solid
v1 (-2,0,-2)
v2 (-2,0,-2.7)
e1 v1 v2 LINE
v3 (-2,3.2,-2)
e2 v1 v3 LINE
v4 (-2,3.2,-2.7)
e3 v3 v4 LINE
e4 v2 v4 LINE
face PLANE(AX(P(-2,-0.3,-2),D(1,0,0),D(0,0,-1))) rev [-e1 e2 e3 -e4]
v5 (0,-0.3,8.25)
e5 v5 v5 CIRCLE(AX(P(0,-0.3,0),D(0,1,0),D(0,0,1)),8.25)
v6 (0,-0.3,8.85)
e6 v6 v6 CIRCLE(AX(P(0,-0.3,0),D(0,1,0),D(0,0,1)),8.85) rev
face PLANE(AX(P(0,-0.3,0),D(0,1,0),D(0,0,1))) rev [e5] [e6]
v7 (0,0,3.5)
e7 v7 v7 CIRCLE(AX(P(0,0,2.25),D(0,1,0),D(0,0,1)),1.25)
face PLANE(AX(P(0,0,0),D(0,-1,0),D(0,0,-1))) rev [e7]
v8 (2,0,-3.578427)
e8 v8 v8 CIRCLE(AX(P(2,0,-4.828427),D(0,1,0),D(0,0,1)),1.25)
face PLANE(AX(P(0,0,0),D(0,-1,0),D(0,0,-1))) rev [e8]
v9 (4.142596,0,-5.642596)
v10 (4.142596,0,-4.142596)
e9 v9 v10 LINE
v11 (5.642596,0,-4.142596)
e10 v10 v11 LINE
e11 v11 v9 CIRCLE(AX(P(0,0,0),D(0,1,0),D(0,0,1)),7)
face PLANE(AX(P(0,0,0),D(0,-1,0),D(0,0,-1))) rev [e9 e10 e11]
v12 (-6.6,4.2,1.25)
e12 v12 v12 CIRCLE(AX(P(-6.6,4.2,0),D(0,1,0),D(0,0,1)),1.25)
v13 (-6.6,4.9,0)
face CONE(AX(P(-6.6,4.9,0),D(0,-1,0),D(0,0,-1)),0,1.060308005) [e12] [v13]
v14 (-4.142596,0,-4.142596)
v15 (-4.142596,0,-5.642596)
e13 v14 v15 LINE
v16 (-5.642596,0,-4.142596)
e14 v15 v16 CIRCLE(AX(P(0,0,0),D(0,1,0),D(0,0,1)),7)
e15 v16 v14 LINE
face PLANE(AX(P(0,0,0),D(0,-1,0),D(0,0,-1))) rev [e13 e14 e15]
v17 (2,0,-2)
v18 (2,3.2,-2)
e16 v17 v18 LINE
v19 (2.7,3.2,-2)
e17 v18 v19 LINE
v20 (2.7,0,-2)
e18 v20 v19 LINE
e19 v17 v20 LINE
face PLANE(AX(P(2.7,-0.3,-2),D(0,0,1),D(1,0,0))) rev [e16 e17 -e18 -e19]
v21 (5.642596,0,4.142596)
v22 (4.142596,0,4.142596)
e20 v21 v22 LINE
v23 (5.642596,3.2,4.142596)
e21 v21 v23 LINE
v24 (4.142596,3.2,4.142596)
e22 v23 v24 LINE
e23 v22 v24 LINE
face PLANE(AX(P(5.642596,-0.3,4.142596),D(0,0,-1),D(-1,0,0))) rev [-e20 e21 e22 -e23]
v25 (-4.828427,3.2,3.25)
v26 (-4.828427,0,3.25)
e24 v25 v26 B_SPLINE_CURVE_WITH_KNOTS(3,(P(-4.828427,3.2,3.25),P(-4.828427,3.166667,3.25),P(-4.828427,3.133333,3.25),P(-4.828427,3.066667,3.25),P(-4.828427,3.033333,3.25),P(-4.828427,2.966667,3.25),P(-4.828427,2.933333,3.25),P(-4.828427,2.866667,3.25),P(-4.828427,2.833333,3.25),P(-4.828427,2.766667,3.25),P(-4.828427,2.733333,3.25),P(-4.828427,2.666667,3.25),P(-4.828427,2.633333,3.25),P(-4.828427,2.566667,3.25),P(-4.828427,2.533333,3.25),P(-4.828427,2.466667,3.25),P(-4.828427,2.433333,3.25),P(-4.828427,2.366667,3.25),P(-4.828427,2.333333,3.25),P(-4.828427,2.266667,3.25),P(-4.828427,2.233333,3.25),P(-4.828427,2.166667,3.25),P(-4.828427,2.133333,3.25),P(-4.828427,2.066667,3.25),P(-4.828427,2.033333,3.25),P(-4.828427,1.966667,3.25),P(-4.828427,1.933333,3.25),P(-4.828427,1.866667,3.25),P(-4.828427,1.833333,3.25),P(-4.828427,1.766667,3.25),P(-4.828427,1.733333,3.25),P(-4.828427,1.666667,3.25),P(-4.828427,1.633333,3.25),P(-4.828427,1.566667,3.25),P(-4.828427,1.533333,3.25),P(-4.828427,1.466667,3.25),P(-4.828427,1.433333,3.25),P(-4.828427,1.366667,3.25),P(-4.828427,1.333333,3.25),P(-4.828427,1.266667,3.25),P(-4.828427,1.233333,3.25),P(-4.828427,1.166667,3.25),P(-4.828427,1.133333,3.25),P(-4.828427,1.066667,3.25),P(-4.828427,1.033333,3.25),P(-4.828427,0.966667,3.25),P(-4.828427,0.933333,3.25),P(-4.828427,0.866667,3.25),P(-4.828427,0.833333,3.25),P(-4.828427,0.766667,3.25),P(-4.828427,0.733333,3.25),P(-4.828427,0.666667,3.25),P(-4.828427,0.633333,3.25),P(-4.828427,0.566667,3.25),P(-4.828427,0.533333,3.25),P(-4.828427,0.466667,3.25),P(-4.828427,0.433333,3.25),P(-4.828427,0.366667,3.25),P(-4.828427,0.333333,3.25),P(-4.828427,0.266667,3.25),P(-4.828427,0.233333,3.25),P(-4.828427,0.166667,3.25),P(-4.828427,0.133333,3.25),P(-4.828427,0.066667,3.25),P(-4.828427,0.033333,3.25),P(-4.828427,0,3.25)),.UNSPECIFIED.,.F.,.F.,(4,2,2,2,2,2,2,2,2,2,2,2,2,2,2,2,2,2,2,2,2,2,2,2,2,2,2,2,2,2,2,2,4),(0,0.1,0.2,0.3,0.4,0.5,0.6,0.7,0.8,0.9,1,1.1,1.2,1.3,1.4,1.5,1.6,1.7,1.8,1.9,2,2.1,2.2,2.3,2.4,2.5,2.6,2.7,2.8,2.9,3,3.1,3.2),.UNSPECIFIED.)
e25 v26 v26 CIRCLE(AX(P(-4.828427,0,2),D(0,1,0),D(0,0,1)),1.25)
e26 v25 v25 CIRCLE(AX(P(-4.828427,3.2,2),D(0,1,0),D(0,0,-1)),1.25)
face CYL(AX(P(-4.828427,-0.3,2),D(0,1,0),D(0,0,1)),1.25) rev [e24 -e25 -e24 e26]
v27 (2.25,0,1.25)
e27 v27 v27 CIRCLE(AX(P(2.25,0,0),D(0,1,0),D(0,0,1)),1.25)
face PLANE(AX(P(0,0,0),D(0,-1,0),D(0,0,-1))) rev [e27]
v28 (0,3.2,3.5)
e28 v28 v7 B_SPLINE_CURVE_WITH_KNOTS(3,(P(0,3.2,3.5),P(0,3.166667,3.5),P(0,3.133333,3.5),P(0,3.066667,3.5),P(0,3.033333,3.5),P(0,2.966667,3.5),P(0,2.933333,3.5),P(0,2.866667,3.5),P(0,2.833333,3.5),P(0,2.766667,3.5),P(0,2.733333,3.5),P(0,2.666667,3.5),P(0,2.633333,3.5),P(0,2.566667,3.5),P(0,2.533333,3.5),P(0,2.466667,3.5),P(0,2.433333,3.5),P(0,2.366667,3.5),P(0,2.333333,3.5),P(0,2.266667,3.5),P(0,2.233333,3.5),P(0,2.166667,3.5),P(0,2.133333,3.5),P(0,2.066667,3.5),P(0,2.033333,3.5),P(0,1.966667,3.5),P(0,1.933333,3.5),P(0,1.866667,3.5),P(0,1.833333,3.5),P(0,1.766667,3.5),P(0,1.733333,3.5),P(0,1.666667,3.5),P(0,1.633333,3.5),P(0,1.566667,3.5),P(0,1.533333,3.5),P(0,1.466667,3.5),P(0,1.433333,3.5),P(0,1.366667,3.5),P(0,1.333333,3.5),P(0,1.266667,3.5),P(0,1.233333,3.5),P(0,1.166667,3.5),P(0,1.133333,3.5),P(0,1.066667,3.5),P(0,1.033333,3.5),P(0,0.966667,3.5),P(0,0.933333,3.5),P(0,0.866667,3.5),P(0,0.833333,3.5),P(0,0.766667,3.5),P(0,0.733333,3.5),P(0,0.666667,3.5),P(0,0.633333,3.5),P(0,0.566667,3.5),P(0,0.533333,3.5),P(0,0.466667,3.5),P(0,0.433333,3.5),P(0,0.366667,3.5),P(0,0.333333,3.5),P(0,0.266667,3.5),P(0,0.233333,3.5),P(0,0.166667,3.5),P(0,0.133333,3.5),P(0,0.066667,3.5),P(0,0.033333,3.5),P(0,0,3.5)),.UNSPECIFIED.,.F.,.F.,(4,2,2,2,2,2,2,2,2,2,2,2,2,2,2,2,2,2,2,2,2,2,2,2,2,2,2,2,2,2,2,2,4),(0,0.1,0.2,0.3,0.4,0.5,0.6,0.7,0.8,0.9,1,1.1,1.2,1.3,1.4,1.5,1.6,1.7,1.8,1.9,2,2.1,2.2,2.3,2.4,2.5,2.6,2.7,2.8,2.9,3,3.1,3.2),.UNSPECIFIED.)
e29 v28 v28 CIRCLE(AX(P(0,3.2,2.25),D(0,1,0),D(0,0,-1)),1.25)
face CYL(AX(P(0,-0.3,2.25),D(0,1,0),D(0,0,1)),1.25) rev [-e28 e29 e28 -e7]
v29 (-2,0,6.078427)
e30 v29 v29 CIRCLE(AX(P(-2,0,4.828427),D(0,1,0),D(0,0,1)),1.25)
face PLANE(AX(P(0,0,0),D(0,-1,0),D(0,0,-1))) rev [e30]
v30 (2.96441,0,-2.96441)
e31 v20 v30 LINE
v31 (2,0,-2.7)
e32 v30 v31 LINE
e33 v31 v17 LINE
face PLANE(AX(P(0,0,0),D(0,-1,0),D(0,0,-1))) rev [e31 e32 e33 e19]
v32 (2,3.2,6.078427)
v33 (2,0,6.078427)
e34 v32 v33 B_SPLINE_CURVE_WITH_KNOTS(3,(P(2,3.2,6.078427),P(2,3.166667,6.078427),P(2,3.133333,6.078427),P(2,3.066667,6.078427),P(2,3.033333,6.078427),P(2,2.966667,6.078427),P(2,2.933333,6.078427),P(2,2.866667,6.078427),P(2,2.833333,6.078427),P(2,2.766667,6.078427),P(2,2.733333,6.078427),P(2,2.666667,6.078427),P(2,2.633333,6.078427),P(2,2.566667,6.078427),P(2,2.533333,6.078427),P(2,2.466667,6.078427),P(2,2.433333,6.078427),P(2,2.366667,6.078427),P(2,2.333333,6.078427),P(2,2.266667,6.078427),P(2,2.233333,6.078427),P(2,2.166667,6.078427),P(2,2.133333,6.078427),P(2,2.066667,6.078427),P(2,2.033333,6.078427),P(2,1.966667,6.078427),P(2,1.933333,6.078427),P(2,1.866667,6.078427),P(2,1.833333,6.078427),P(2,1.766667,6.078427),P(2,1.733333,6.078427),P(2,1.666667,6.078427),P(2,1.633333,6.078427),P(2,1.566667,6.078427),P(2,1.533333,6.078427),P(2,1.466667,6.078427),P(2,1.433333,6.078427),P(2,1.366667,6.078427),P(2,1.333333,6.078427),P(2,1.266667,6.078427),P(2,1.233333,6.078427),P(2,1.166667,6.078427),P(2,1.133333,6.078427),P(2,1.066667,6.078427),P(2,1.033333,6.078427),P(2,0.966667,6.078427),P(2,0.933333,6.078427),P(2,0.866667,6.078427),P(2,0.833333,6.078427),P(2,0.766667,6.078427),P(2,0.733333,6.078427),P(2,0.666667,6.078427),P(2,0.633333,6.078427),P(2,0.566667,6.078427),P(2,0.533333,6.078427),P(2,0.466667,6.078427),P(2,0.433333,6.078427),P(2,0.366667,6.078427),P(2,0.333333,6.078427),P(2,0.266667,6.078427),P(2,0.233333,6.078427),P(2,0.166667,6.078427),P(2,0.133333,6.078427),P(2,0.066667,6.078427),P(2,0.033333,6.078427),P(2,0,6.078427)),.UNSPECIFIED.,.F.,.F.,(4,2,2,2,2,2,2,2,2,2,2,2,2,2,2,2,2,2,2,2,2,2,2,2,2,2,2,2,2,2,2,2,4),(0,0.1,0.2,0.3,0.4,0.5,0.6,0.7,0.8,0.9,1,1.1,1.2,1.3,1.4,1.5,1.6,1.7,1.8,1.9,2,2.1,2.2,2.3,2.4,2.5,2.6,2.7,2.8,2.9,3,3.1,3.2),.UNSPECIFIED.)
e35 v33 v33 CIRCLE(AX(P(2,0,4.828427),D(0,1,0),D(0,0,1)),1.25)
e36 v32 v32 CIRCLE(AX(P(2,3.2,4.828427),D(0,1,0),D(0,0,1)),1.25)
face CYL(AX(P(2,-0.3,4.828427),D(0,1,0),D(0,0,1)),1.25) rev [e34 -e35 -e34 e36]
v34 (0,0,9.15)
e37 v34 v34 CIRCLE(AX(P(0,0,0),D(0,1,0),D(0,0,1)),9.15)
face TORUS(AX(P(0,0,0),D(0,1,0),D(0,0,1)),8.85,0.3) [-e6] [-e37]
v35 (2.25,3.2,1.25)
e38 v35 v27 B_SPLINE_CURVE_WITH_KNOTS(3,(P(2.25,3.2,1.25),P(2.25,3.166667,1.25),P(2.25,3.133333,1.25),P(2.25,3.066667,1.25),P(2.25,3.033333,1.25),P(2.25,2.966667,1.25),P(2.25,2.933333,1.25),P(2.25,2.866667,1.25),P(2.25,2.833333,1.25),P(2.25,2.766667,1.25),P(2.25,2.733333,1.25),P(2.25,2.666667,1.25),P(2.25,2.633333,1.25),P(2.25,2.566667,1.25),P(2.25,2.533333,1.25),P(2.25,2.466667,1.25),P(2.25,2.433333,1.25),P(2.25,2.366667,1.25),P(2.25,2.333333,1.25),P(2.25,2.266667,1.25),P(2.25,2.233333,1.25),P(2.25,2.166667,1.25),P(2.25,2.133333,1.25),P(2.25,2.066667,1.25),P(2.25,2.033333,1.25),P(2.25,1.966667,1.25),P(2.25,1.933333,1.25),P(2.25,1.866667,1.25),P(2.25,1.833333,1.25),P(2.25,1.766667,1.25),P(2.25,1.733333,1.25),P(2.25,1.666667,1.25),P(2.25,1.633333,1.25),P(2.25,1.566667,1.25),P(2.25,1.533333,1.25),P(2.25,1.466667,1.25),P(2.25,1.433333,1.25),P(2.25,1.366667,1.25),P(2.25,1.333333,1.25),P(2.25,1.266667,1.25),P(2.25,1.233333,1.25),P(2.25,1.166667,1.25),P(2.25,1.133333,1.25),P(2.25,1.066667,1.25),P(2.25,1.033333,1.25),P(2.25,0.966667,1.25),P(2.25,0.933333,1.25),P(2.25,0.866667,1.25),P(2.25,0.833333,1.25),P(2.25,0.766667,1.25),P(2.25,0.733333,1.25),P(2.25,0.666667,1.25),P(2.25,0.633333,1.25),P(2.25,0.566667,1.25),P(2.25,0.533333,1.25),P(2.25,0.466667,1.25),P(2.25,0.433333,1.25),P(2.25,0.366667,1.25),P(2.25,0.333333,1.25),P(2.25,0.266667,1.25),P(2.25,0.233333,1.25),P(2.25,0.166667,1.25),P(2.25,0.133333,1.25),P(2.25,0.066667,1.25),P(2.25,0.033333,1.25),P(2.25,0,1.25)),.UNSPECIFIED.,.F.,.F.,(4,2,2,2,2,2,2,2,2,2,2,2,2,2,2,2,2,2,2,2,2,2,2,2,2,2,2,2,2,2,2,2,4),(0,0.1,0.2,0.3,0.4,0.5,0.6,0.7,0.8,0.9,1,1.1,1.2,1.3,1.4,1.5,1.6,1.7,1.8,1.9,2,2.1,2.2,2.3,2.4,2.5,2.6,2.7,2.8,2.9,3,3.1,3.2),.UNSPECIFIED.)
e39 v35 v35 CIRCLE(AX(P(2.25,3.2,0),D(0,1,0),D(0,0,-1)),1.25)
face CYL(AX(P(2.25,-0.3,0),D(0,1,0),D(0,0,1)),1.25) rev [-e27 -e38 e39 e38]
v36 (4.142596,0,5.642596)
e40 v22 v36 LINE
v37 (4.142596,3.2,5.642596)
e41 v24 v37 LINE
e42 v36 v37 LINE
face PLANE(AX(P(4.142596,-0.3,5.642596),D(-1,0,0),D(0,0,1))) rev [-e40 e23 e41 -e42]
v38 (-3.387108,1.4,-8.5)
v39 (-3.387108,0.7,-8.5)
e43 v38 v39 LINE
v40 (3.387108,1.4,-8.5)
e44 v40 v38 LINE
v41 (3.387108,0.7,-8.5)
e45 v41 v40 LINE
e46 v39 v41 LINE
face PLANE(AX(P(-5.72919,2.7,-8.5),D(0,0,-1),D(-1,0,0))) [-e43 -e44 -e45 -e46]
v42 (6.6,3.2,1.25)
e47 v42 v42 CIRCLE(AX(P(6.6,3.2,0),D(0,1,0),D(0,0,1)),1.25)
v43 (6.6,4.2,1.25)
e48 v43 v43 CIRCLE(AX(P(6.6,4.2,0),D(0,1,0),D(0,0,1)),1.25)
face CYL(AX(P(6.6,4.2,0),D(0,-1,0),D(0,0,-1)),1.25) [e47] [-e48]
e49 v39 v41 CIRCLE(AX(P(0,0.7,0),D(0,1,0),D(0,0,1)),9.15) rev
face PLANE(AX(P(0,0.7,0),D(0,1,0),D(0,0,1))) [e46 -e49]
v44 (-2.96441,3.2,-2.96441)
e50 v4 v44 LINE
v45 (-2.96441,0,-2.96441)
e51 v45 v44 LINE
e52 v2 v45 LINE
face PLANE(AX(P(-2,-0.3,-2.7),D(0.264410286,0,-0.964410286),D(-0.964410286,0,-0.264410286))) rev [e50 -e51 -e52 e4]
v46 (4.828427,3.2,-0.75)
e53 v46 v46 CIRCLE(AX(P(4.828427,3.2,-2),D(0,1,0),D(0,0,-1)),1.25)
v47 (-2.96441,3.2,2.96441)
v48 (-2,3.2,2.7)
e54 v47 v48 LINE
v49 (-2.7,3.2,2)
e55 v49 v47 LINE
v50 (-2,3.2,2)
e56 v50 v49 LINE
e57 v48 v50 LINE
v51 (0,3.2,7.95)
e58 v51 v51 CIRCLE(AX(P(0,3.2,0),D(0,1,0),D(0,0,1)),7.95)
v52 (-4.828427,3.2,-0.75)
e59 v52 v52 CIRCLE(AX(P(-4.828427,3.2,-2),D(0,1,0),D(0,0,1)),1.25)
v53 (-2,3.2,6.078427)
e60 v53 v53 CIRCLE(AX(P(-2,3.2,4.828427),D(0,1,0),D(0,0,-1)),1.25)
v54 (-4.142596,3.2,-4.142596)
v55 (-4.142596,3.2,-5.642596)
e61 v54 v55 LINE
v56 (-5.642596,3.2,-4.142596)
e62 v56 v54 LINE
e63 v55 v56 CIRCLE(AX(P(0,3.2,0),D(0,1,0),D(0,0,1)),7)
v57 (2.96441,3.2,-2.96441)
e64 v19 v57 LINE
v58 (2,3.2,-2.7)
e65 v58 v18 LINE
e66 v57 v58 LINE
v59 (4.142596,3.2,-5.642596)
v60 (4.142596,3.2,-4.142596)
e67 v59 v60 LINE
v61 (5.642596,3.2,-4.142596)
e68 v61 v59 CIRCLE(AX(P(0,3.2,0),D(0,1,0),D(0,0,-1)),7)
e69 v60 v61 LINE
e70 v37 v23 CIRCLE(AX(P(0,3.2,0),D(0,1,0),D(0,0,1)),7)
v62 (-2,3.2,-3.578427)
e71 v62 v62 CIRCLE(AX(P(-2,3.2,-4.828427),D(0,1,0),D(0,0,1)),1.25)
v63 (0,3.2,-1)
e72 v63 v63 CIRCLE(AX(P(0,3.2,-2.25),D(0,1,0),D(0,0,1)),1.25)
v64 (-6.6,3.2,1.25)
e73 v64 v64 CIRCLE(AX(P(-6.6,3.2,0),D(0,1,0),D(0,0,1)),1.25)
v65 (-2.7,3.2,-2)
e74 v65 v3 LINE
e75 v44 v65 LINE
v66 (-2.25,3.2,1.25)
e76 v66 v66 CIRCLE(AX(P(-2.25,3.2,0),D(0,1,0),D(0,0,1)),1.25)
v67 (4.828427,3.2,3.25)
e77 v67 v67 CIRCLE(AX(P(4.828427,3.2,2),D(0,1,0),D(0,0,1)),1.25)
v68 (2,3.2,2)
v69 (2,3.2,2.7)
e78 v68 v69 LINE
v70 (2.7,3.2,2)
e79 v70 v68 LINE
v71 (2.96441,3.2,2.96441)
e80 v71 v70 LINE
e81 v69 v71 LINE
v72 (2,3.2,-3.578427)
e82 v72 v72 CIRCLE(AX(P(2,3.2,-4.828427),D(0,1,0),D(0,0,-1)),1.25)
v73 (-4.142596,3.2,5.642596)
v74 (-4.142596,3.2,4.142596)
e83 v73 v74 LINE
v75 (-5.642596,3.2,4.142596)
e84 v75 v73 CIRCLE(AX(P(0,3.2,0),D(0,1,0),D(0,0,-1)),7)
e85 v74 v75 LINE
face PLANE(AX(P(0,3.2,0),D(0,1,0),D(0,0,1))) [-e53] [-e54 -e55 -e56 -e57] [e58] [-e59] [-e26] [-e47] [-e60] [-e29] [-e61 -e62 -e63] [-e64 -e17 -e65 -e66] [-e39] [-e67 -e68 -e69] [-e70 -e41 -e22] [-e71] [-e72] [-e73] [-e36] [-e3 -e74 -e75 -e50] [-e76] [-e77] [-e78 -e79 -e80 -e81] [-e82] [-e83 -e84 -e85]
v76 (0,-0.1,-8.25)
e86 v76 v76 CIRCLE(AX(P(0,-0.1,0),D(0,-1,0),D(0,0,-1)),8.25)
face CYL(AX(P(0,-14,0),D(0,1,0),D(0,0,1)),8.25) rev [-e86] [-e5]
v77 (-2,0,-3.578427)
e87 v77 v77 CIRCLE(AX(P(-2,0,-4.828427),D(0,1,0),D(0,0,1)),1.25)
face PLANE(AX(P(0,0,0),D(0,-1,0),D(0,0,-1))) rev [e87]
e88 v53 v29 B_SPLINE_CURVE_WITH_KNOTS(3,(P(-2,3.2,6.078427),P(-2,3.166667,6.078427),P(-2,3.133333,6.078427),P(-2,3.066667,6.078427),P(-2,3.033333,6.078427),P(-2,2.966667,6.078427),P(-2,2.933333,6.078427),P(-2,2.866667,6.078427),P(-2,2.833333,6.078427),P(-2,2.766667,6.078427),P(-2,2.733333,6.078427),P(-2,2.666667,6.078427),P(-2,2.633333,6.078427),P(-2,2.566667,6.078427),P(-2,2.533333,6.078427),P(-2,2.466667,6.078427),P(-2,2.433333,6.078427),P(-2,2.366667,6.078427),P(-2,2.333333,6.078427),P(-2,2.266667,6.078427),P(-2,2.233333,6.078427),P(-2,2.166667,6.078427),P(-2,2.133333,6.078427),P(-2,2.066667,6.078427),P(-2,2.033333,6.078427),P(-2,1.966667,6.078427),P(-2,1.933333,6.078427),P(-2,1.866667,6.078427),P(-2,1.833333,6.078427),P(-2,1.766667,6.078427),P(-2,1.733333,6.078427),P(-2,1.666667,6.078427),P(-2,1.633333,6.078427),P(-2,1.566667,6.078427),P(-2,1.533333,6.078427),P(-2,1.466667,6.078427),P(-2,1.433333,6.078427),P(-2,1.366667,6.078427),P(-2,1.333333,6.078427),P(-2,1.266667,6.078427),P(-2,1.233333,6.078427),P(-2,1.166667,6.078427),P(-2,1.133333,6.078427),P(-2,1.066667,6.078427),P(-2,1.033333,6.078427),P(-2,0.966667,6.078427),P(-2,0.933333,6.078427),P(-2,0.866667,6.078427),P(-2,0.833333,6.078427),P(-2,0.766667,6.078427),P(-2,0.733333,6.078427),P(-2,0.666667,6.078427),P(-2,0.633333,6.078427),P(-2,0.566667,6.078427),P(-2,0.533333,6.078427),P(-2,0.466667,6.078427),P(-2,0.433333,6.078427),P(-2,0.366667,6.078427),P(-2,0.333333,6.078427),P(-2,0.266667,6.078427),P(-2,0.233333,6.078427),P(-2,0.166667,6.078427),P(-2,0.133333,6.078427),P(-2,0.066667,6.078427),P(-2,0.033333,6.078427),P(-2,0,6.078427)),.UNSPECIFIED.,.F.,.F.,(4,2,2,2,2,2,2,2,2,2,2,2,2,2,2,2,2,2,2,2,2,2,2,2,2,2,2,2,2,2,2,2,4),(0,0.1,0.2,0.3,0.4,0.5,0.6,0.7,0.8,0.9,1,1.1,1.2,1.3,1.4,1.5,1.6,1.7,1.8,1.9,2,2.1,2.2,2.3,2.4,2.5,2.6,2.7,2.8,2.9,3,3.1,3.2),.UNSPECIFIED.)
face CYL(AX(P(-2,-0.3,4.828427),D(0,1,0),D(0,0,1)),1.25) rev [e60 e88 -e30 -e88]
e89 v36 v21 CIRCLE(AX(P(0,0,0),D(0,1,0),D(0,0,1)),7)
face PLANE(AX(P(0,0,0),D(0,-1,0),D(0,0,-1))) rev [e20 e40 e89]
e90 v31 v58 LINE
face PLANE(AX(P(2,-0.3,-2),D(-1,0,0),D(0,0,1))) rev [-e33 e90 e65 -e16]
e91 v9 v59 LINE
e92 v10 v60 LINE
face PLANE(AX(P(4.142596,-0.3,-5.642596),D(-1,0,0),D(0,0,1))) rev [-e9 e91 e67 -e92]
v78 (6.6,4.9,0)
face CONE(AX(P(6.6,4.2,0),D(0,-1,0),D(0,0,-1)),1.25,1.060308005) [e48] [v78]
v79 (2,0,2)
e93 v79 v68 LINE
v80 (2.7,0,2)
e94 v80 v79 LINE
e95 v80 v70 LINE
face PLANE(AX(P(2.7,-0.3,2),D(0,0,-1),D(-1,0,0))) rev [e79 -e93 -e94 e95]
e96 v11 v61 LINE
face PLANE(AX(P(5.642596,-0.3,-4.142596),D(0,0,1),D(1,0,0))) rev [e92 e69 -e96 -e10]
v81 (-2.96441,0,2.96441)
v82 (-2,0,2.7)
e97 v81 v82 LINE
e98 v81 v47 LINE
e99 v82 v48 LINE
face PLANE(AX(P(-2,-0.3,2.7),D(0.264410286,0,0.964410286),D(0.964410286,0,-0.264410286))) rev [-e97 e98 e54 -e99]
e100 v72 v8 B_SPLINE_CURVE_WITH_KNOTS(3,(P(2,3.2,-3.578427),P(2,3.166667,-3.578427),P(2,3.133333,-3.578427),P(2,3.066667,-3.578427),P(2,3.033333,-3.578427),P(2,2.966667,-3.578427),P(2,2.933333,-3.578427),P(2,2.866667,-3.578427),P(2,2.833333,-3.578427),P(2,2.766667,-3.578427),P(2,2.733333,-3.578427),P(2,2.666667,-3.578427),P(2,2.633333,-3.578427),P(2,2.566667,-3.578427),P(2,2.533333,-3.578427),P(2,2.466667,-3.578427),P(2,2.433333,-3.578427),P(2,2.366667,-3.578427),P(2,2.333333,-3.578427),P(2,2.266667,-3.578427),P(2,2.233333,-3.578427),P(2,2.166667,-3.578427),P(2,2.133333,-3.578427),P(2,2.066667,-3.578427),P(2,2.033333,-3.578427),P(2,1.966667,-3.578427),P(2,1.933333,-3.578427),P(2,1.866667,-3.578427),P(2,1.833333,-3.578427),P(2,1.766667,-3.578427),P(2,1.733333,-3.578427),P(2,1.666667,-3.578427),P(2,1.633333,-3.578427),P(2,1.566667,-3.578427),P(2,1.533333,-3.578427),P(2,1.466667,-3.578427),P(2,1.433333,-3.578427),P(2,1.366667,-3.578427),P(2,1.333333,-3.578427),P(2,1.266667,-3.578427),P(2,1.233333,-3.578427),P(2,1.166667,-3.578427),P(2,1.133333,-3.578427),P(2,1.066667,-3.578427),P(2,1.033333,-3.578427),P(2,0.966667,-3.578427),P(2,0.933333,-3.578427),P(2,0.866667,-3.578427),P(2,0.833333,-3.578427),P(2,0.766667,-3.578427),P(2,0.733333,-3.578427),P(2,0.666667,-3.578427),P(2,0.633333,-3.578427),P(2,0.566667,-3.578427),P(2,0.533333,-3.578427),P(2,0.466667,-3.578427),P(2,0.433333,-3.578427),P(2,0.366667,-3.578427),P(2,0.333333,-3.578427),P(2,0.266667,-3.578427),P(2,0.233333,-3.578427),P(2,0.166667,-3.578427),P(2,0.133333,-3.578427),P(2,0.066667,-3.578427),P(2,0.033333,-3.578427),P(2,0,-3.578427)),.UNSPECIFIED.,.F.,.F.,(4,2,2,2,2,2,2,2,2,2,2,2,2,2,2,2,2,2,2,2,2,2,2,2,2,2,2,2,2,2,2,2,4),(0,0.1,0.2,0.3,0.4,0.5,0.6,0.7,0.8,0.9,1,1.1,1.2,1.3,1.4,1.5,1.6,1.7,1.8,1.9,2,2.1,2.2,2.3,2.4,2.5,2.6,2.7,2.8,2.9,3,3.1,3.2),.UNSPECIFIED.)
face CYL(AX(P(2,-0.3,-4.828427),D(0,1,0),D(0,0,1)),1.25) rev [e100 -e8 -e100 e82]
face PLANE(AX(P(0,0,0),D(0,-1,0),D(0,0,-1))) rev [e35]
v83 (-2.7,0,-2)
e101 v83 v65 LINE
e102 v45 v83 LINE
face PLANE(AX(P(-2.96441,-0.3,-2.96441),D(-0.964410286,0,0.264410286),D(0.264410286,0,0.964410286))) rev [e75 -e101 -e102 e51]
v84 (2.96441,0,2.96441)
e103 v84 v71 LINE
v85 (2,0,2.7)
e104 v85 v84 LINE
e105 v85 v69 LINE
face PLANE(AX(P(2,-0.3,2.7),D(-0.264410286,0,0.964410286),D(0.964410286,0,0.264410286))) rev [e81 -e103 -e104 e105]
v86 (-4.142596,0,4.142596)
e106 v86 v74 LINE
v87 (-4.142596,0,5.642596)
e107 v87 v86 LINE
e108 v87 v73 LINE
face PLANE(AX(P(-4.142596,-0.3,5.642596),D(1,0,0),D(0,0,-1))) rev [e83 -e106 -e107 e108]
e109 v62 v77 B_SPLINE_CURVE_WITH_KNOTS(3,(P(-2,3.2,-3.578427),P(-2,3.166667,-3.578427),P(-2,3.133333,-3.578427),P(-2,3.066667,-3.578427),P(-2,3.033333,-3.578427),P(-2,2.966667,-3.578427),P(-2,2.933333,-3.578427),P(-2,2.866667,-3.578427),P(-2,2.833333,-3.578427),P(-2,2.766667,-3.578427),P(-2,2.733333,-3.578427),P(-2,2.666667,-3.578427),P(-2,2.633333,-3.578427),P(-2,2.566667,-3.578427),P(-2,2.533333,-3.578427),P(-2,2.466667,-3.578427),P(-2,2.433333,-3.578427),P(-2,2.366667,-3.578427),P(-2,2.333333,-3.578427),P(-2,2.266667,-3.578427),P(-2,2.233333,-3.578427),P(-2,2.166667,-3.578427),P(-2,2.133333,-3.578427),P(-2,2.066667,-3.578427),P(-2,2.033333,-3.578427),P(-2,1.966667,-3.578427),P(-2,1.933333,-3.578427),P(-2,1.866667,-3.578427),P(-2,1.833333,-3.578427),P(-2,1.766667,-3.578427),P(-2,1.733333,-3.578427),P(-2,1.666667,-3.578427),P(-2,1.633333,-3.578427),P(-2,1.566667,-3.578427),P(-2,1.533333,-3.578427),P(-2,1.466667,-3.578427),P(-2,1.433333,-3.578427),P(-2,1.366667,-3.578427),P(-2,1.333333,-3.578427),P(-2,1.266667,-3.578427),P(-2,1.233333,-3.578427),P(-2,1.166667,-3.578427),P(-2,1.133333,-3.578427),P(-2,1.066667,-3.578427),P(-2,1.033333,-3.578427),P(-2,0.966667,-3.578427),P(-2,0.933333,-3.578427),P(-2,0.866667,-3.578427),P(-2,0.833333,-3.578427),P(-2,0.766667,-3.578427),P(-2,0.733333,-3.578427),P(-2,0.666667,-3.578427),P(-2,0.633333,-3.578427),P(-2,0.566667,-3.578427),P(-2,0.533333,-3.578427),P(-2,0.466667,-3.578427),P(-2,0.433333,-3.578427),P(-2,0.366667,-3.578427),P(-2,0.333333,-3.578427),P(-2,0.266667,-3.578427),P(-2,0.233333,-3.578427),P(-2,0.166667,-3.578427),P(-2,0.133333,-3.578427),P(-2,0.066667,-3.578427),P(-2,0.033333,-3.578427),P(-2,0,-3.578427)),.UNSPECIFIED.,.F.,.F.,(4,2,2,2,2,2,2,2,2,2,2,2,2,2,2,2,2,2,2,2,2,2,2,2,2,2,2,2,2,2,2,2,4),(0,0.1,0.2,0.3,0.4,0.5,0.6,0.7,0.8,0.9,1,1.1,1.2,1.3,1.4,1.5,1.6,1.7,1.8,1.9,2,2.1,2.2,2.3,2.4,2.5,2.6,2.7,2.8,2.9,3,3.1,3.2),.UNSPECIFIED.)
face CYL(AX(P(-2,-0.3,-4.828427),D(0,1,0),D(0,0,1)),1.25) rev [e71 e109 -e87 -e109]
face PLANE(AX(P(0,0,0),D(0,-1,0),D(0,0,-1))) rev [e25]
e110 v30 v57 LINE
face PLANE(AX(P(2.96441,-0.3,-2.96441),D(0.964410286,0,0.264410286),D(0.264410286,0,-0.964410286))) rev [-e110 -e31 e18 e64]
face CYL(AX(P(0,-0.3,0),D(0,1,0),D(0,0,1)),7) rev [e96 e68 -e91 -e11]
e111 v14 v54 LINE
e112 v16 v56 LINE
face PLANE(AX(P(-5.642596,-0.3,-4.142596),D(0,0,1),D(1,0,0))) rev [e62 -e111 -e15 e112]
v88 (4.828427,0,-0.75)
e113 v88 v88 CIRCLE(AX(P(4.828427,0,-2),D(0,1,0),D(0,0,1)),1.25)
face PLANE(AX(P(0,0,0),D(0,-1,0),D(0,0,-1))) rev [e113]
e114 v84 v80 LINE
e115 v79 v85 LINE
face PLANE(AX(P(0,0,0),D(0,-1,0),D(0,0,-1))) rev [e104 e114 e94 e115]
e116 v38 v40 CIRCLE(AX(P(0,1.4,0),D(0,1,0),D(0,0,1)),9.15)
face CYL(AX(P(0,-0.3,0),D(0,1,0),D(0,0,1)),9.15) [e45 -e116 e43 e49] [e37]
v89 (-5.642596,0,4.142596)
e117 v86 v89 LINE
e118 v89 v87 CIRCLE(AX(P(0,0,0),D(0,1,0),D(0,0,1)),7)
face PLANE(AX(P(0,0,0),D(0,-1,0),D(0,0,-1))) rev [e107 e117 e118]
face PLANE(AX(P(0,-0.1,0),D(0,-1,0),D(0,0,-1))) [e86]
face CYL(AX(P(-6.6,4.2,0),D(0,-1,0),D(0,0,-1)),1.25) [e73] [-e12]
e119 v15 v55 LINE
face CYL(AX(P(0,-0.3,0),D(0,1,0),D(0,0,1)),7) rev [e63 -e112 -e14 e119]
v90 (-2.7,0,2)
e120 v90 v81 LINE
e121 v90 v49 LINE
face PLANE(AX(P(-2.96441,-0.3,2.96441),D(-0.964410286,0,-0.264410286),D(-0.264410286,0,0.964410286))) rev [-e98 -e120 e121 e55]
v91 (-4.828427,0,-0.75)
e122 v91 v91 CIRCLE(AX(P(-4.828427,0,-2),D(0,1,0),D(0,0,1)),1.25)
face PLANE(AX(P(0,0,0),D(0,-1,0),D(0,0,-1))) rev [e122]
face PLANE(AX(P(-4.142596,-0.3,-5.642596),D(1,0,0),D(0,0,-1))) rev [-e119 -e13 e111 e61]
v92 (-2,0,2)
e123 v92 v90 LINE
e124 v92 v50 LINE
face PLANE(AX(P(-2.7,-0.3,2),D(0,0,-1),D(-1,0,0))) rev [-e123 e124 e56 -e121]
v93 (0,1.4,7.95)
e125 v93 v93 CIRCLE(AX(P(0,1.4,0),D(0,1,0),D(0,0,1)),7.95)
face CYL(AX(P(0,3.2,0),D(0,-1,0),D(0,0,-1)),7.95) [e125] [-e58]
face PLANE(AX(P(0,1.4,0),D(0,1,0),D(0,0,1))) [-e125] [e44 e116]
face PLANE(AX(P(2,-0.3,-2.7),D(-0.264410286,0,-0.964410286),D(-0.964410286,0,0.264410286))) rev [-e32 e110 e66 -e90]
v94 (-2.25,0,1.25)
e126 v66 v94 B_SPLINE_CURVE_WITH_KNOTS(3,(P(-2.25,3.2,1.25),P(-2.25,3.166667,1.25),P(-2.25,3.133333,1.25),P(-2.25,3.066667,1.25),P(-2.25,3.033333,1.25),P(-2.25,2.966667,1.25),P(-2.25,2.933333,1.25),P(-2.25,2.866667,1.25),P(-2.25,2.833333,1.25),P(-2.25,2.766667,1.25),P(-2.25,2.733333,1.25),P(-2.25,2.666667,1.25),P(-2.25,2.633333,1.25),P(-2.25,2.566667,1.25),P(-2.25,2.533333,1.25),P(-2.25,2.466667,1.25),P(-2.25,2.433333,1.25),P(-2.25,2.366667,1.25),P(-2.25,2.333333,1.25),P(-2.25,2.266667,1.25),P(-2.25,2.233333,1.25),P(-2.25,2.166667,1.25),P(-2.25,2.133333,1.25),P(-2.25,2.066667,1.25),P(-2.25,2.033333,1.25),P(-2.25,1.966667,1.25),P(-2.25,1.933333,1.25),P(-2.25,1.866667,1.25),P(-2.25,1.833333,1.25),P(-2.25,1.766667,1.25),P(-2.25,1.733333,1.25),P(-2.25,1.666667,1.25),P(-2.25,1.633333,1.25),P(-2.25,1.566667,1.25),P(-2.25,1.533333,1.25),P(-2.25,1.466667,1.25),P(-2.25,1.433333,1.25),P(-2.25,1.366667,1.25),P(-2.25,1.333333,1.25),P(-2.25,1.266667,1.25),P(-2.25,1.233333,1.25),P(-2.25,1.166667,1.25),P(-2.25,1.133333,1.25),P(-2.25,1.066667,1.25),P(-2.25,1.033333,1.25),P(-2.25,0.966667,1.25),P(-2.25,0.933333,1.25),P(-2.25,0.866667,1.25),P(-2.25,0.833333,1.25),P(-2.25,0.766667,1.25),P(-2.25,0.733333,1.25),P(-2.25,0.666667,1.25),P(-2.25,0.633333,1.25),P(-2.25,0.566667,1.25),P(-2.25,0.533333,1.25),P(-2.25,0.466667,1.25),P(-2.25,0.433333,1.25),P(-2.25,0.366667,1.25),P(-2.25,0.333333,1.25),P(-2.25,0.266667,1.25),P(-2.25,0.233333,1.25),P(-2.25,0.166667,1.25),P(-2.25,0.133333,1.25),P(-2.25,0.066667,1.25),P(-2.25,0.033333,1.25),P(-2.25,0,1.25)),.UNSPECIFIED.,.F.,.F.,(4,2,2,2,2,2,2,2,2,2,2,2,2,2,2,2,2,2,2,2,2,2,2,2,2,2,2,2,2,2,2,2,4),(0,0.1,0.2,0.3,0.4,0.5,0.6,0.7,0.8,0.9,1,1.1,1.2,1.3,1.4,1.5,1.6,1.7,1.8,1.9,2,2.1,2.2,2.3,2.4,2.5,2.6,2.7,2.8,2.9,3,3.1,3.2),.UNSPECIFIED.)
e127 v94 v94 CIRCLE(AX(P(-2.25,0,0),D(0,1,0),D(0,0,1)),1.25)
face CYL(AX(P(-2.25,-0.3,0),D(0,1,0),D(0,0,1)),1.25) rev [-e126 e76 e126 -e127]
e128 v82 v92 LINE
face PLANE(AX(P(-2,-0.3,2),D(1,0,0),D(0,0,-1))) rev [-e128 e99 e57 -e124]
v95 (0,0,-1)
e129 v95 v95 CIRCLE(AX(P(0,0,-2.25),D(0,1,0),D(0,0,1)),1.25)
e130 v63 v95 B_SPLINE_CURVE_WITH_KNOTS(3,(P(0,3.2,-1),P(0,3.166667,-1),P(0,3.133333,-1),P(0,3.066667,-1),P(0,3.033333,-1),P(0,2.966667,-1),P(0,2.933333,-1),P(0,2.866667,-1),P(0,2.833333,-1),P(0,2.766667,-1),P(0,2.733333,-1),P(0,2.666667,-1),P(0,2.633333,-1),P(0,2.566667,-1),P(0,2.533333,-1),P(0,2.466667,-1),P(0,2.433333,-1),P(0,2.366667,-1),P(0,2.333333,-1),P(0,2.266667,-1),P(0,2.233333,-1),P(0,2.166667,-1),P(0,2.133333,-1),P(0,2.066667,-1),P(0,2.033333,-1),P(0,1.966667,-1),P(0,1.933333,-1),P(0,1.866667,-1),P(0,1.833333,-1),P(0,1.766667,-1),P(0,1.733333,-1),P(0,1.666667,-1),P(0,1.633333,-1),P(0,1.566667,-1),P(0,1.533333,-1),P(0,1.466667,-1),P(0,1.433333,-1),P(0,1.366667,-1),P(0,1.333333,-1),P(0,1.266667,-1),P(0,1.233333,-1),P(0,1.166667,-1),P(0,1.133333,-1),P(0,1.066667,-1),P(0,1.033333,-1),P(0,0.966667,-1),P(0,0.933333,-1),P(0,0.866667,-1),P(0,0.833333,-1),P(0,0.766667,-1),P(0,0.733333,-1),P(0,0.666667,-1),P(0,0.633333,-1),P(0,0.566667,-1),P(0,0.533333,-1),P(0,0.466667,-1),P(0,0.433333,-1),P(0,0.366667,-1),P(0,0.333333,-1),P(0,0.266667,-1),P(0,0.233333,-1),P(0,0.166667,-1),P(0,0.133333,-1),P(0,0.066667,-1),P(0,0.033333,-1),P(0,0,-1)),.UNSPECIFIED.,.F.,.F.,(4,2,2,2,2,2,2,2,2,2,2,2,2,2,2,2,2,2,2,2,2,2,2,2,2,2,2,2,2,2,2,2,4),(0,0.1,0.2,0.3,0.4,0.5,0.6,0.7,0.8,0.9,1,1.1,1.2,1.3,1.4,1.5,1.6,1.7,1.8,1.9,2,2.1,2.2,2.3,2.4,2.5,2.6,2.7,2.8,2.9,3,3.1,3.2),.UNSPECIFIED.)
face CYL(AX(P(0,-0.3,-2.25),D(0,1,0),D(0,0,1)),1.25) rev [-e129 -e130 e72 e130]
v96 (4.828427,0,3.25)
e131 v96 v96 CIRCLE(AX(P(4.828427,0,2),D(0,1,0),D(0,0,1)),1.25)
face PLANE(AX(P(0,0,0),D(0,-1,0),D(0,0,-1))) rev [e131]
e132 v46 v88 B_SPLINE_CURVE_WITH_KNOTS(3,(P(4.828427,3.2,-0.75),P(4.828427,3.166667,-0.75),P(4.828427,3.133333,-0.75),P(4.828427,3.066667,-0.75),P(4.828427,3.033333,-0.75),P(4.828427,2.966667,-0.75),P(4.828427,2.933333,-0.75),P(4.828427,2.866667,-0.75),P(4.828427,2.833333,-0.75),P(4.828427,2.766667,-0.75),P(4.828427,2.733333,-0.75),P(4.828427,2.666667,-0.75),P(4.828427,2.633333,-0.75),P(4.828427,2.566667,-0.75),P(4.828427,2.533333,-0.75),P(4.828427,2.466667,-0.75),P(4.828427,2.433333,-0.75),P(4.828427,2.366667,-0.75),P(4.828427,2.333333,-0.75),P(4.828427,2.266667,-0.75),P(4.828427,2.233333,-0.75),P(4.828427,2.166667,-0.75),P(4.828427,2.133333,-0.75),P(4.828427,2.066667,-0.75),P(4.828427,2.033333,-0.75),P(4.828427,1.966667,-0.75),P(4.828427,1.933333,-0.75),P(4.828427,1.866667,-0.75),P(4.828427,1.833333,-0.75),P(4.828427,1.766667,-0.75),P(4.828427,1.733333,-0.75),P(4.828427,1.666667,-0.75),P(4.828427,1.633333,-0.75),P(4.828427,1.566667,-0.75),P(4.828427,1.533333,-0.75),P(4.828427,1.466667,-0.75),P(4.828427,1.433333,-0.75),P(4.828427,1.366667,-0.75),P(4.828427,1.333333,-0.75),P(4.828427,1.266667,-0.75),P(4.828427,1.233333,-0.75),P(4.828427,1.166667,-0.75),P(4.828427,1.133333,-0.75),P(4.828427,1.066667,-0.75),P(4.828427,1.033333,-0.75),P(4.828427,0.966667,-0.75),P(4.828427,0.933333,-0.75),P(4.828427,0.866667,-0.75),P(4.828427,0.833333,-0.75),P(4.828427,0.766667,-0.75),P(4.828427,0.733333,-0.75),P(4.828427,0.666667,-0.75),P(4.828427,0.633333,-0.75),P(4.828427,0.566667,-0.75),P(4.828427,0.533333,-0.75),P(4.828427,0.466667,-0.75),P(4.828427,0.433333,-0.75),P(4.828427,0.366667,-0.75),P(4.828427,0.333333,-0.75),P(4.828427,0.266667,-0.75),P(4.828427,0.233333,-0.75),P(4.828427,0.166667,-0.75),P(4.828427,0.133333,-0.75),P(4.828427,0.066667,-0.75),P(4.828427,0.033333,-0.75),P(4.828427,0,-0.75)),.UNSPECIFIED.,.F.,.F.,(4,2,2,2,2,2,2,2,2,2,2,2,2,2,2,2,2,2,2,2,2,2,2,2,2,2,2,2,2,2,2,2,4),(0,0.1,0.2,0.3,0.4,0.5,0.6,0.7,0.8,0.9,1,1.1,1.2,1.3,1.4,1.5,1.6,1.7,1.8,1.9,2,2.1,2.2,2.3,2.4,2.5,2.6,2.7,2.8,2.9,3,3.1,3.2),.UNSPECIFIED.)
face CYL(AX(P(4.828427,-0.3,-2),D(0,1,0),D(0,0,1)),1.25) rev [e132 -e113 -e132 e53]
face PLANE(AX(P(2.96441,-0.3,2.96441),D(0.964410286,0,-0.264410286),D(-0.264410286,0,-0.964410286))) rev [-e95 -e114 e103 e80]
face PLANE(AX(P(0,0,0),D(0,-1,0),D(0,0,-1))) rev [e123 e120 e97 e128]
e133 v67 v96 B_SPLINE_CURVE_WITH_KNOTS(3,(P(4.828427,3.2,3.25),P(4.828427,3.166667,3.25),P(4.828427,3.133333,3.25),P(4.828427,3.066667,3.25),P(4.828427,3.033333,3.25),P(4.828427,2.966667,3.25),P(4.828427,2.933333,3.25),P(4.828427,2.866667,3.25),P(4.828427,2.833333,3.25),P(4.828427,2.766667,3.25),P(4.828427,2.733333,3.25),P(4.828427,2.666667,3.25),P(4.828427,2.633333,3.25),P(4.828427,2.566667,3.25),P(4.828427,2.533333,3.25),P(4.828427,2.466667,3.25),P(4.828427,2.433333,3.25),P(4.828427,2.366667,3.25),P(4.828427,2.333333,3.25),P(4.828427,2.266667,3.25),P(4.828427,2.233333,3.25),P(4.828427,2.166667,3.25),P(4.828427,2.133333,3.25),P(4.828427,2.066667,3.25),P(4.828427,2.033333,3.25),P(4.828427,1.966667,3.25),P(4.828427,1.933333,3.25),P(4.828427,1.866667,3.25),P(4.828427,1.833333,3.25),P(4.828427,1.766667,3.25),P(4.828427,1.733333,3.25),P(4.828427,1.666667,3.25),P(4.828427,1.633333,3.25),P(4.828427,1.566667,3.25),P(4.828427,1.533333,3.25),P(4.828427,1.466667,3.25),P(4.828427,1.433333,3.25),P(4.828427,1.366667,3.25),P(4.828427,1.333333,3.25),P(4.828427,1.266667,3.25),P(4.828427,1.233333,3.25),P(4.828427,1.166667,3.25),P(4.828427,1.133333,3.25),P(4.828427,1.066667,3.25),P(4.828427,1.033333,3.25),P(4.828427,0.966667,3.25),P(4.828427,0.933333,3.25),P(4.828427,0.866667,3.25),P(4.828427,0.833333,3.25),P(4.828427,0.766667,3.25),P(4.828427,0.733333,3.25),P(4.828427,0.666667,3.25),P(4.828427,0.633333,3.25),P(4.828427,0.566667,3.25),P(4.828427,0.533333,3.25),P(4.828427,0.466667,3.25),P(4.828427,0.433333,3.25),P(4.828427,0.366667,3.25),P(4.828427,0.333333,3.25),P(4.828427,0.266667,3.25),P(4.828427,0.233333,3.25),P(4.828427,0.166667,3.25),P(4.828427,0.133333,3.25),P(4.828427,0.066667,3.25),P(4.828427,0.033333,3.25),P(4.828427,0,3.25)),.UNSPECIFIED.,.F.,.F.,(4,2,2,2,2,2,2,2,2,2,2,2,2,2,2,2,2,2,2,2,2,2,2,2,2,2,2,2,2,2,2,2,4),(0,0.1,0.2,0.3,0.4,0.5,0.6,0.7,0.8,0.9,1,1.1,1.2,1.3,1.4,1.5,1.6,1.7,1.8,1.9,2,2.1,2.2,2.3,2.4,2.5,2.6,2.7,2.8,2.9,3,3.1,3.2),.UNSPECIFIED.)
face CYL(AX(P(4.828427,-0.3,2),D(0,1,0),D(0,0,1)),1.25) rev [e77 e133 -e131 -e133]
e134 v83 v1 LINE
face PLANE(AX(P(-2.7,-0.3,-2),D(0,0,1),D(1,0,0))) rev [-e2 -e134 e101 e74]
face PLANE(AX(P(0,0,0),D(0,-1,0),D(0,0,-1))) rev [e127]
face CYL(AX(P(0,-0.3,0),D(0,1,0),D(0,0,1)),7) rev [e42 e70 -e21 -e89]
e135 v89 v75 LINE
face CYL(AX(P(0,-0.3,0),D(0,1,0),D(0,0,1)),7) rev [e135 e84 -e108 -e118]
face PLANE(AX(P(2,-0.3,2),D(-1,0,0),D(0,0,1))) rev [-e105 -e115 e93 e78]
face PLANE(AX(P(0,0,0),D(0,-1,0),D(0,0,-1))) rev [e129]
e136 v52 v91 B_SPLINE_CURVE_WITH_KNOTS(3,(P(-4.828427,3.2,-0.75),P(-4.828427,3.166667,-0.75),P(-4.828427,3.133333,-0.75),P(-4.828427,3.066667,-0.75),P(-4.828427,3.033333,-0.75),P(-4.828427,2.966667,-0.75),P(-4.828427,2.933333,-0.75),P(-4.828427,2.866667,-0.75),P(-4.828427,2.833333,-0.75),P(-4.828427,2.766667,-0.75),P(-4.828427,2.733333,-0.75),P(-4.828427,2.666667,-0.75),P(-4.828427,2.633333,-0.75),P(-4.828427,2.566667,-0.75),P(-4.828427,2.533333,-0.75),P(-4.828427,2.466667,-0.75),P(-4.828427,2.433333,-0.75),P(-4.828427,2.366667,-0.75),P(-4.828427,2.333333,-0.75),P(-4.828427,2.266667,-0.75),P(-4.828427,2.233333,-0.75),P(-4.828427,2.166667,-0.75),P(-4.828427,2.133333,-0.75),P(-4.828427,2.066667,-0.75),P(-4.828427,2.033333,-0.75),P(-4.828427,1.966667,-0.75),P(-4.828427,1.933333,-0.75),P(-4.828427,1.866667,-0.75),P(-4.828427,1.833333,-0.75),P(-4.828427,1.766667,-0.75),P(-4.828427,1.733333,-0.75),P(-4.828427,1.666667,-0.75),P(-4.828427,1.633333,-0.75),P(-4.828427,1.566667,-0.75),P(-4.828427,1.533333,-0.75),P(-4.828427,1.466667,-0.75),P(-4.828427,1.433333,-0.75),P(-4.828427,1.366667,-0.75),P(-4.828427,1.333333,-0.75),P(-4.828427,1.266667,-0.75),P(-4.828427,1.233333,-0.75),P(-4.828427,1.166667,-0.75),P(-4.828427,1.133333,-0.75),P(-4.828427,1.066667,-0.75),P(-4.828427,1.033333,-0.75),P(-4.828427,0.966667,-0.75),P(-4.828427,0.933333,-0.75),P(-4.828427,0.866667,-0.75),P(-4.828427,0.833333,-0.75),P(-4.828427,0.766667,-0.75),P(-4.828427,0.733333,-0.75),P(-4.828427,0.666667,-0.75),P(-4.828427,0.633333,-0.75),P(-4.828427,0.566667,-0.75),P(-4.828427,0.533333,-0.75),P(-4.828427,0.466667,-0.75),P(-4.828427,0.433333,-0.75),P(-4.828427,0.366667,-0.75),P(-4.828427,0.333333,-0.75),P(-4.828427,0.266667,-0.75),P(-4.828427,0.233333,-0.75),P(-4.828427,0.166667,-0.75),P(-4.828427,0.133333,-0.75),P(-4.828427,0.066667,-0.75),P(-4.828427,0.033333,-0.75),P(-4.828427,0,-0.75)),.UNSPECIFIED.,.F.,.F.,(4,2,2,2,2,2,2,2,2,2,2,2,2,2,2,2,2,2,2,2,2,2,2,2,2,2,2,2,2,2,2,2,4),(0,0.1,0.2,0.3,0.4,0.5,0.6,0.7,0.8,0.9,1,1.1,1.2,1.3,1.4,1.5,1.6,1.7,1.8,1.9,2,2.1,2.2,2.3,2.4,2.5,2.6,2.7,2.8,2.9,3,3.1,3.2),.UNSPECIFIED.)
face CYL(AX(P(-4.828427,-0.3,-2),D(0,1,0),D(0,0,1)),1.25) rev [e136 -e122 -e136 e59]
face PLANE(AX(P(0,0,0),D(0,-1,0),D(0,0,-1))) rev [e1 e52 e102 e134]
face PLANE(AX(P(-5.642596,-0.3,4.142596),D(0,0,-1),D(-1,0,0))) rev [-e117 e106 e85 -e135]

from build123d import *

# Parameters (mm, degrees)
BOSS_EXTRUDE1_DEPTH      = 1.4
BOSS_EXTRUDE1_DEPTH_BACK = 0.3
SKETCH1_R                = 9.15
SKETCH2_R                = 8.25
CUT_EXTRUDE1_DEPTH       = 14
SKETCH3_R                = 7.95
BOSS_EXTRUDE2_DEPTH      = 1.8
SKETCH4_R                = 1.25
CUT_EXTRUDE2_DEPTH       = 14.405036367
SKETCH6_R                = 1.25
BOSS_EXTRUDE3_DEPTH      = 1
FILLET1_R                = 0.3
CUT_EXTRUDE6_START       = 0.7
SKETCH9_W                = 11.458380674
SKETCH9_H                = 2.677452805
CUT_EXTRUDE6_DEPTH       = 2
CROQUIS1_R               = 8.25
SALIENTE_EXTRUIR1_DEPTH  = 0.1


with BuildPart() as part:
    # Sketch1 → Boss-Extrude1 (new, two sides: drawn at the far end of the back side and taken through both)
    with BuildSketch(Plane(origin=(0, 0, 0), x_dir=(1, 0, 0), z_dir=(0, 1, 0)).offset(-BOSS_EXTRUDE1_DEPTH_BACK)):
        with Locations(Location((0, 0, 0), (0, 0, 270))):
            Circle(SKETCH1_R)
    extrude(amount=BOSS_EXTRUDE1_DEPTH + BOSS_EXTRUDE1_DEPTH_BACK)

    # Sketch2 → Cut-Extrude1 (cut)
    with BuildSketch(Plane(origin=(0, 0, 0), x_dir=(1, 0, 0), z_dir=(0, 1, 0))):
        with Locations(Location((0, 0, 0), (0, 0, 270))):
            Circle(SKETCH2_R)
    extrude(amount=-CUT_EXTRUDE1_DEPTH, mode=Mode.SUBTRACT)

    # Sketch3 → Boss-Extrude2 (add)
    with BuildSketch(Plane(origin=(0, 1.4, 0), x_dir=(1, 0, 0), z_dir=(0, 1, 0))):
        with Locations(Location((0, 0, 0), (0, 0, 270))):
            Circle(SKETCH3_R)
    extrude(amount=BOSS_EXTRUDE2_DEPTH)

    # Sketch4 → Cut-Extrude2 (cut, through all)
    with BuildSketch(Plane(origin=(0, 3.2, 0), x_dir=(1, 0, 0), z_dir=(0, 1, 0))):
        with Locations(Location((-2.25, 0, 0), (0, 0, 270))):
            Circle(SKETCH4_R)
        with Locations(Location((0, 2.25, 0), (0, 0, 270))):
            Circle(SKETCH4_R)
        with Locations(Location((-2, 4.828427125, 0), (0, 0, 270))):
            Circle(SKETCH4_R)
        with Locations(Location((-4.828427125, 2, 0), (0, 0, 270))):
            Circle(SKETCH4_R)
        with Locations(Location((4.828427125, 2, 0), (0, 0, 270))):
            Circle(SKETCH4_R)
        with Locations(Location((2, 4.828427125, 0), (0, 0, 270))):
            Circle(SKETCH4_R)
        with Locations(Location((2.25, 0, 0), (0, 0, 270))):
            Circle(SKETCH4_R)
        with Locations(Location((2, -4.828427125, 0), (0, 0, 270))):
            Circle(SKETCH4_R)
        with Locations(Location((4.828427125, -2, 0), (0, 0, 270))):
            Circle(SKETCH4_R)
        with Locations(Location((-4.828427125, -2, 0), (0, 0, 270))):
            Circle(SKETCH4_R)
        with Locations(Location((-2, -4.828427125, 0), (0, 0, 270))):
            Circle(SKETCH4_R)
        with Locations(Location((0, -2.25, 0), (0, 0, 270))):
            Circle(SKETCH4_R)
        with BuildLine():
            Line((-5.642596448, 4.142596448), (-4.142596448, 4.142596448))
            Line((-4.142596448, 4.142596448), (-4.142596448, 5.642596448))
            ThreePointArc((-4.142596448, 5.642596448), (-4.949747468, 4.949747468), (-5.642596448, 4.142596448))
        make_face()
        Polygon((-2.7, 2), (-2, 2), (-2, 2.7), (-2.964410286, 2.964410286), align=None)
        Polygon((2.964410286, 2.964410286), (2.7, 2), (2, 2), (2, 2.7), align=None)
        with BuildLine():
            Line((4.142596448, 5.642596448), (4.142596448, 4.142596448))
            Line((4.142596448, 4.142596448), (5.642596448, 4.142596448))
            ThreePointArc((5.642596448, 4.142596448), (4.949747468, 4.949747468), (4.142596448, 5.642596448))
        make_face()
        with BuildLine():
            Line((5.642596448, -4.142596448), (4.142596448, -4.142596448))
            Line((4.142596448, -4.142596448), (4.142596448, -5.642596448))
            ThreePointArc((4.142596448, -5.642596448), (4.949747468, -4.949747468), (5.642596448, -4.142596448))
        make_face()
        Polygon((2.7, -2), (2, -2), (2, -2.7), (2.964410286, -2.964410286), align=None)
        Polygon((-2.964410286, -2.964410286), (-2.7, -2), (-2, -2), (-2, -2.7), align=None)
        with BuildLine():
            Line((-4.142596448, -5.642596448), (-4.142596448, -4.142596448))
            Line((-4.142596448, -4.142596448), (-5.642596448, -4.142596448))
            ThreePointArc((-5.642596448, -4.142596448), (-4.949747468, -4.949747468), (-4.142596448, -5.642596448))
        make_face()
    extrude(amount=-CUT_EXTRUDE2_DEPTH, mode=Mode.SUBTRACT)

    # Sketch6 → Boss-Extrude3 (add)
    with BuildSketch(Plane(origin=(0, 3.2, 0), x_dir=(1, 0, 0), z_dir=(0, 1, 0))):
        with Locations(Location((-6.6, 0, 0), (0, 0, 270))):
            Circle(SKETCH6_R)
        with Locations(Location((6.6, 0, 0), (0, 0, 270))):
            Circle(SKETCH6_R)
    extrude(amount=BOSS_EXTRUDE3_DEPTH)

    # Sketch7 → Revolve1 (revolve)
    with BuildSketch(Plane.XY, mode=Mode.PRIVATE) as revolve1_sk:
        Polygon((-7.85, 4.2), (-6.6, 4.2), (-6.6, 4.9), align=None)
    revolve(revolve1_sk.sketch.rotate(Axis((-6.6, 4.2, 0), (0, 1, 0)), 270), axis=Axis((-6.6, 4.2, 0), (0, 1, 0)))

    # Sketch8 → Revolve2 (revolve)
    with BuildSketch(Plane.XY, mode=Mode.PRIVATE) as revolve2_sk:
        Polygon((7.85, 4.2), (6.6, 4.2), (6.6, 4.9), align=None)
    revolve(revolve2_sk.sketch.rotate(Axis((6.6, 4.2, 0), (0, 1, 0)), 90), axis=Axis((6.6, 4.2, 0), (0, 1, 0)))

    # Fillet1
    fillet1_edges = [part.edges().sort_by_distance(p)[0] for p in [
        (0, -0.3, -9.15),
    ]]
    fillet(fillet1_edges, radius=FILLET1_R - 0.0001)  # a hair under: the kernel refuses the full size

    # Sketch9 → Cut-Extrude6 (cut)
    with BuildSketch(Plane(origin=(0, 0, 0), x_dir=(1, 0, 0), z_dir=(0, 1, 0)).offset(CUT_EXTRUDE6_START)):
        with Locations((0, 9.838726403)):
            Rectangle(SKETCH9_W, SKETCH9_H)
    extrude(amount=CUT_EXTRUDE6_DEPTH, mode=Mode.SUBTRACT)

    # Croquis1 → Saliente-Extruir1 (add)
    with BuildSketch(Plane.XZ):
        with Locations(Location((0, 0, 0), (0, 0, 90))):
            Circle(CROQUIS1_R)
    extrude(amount=SALIENTE_EXTRUIR1_DEPTH)


solid = part.part
